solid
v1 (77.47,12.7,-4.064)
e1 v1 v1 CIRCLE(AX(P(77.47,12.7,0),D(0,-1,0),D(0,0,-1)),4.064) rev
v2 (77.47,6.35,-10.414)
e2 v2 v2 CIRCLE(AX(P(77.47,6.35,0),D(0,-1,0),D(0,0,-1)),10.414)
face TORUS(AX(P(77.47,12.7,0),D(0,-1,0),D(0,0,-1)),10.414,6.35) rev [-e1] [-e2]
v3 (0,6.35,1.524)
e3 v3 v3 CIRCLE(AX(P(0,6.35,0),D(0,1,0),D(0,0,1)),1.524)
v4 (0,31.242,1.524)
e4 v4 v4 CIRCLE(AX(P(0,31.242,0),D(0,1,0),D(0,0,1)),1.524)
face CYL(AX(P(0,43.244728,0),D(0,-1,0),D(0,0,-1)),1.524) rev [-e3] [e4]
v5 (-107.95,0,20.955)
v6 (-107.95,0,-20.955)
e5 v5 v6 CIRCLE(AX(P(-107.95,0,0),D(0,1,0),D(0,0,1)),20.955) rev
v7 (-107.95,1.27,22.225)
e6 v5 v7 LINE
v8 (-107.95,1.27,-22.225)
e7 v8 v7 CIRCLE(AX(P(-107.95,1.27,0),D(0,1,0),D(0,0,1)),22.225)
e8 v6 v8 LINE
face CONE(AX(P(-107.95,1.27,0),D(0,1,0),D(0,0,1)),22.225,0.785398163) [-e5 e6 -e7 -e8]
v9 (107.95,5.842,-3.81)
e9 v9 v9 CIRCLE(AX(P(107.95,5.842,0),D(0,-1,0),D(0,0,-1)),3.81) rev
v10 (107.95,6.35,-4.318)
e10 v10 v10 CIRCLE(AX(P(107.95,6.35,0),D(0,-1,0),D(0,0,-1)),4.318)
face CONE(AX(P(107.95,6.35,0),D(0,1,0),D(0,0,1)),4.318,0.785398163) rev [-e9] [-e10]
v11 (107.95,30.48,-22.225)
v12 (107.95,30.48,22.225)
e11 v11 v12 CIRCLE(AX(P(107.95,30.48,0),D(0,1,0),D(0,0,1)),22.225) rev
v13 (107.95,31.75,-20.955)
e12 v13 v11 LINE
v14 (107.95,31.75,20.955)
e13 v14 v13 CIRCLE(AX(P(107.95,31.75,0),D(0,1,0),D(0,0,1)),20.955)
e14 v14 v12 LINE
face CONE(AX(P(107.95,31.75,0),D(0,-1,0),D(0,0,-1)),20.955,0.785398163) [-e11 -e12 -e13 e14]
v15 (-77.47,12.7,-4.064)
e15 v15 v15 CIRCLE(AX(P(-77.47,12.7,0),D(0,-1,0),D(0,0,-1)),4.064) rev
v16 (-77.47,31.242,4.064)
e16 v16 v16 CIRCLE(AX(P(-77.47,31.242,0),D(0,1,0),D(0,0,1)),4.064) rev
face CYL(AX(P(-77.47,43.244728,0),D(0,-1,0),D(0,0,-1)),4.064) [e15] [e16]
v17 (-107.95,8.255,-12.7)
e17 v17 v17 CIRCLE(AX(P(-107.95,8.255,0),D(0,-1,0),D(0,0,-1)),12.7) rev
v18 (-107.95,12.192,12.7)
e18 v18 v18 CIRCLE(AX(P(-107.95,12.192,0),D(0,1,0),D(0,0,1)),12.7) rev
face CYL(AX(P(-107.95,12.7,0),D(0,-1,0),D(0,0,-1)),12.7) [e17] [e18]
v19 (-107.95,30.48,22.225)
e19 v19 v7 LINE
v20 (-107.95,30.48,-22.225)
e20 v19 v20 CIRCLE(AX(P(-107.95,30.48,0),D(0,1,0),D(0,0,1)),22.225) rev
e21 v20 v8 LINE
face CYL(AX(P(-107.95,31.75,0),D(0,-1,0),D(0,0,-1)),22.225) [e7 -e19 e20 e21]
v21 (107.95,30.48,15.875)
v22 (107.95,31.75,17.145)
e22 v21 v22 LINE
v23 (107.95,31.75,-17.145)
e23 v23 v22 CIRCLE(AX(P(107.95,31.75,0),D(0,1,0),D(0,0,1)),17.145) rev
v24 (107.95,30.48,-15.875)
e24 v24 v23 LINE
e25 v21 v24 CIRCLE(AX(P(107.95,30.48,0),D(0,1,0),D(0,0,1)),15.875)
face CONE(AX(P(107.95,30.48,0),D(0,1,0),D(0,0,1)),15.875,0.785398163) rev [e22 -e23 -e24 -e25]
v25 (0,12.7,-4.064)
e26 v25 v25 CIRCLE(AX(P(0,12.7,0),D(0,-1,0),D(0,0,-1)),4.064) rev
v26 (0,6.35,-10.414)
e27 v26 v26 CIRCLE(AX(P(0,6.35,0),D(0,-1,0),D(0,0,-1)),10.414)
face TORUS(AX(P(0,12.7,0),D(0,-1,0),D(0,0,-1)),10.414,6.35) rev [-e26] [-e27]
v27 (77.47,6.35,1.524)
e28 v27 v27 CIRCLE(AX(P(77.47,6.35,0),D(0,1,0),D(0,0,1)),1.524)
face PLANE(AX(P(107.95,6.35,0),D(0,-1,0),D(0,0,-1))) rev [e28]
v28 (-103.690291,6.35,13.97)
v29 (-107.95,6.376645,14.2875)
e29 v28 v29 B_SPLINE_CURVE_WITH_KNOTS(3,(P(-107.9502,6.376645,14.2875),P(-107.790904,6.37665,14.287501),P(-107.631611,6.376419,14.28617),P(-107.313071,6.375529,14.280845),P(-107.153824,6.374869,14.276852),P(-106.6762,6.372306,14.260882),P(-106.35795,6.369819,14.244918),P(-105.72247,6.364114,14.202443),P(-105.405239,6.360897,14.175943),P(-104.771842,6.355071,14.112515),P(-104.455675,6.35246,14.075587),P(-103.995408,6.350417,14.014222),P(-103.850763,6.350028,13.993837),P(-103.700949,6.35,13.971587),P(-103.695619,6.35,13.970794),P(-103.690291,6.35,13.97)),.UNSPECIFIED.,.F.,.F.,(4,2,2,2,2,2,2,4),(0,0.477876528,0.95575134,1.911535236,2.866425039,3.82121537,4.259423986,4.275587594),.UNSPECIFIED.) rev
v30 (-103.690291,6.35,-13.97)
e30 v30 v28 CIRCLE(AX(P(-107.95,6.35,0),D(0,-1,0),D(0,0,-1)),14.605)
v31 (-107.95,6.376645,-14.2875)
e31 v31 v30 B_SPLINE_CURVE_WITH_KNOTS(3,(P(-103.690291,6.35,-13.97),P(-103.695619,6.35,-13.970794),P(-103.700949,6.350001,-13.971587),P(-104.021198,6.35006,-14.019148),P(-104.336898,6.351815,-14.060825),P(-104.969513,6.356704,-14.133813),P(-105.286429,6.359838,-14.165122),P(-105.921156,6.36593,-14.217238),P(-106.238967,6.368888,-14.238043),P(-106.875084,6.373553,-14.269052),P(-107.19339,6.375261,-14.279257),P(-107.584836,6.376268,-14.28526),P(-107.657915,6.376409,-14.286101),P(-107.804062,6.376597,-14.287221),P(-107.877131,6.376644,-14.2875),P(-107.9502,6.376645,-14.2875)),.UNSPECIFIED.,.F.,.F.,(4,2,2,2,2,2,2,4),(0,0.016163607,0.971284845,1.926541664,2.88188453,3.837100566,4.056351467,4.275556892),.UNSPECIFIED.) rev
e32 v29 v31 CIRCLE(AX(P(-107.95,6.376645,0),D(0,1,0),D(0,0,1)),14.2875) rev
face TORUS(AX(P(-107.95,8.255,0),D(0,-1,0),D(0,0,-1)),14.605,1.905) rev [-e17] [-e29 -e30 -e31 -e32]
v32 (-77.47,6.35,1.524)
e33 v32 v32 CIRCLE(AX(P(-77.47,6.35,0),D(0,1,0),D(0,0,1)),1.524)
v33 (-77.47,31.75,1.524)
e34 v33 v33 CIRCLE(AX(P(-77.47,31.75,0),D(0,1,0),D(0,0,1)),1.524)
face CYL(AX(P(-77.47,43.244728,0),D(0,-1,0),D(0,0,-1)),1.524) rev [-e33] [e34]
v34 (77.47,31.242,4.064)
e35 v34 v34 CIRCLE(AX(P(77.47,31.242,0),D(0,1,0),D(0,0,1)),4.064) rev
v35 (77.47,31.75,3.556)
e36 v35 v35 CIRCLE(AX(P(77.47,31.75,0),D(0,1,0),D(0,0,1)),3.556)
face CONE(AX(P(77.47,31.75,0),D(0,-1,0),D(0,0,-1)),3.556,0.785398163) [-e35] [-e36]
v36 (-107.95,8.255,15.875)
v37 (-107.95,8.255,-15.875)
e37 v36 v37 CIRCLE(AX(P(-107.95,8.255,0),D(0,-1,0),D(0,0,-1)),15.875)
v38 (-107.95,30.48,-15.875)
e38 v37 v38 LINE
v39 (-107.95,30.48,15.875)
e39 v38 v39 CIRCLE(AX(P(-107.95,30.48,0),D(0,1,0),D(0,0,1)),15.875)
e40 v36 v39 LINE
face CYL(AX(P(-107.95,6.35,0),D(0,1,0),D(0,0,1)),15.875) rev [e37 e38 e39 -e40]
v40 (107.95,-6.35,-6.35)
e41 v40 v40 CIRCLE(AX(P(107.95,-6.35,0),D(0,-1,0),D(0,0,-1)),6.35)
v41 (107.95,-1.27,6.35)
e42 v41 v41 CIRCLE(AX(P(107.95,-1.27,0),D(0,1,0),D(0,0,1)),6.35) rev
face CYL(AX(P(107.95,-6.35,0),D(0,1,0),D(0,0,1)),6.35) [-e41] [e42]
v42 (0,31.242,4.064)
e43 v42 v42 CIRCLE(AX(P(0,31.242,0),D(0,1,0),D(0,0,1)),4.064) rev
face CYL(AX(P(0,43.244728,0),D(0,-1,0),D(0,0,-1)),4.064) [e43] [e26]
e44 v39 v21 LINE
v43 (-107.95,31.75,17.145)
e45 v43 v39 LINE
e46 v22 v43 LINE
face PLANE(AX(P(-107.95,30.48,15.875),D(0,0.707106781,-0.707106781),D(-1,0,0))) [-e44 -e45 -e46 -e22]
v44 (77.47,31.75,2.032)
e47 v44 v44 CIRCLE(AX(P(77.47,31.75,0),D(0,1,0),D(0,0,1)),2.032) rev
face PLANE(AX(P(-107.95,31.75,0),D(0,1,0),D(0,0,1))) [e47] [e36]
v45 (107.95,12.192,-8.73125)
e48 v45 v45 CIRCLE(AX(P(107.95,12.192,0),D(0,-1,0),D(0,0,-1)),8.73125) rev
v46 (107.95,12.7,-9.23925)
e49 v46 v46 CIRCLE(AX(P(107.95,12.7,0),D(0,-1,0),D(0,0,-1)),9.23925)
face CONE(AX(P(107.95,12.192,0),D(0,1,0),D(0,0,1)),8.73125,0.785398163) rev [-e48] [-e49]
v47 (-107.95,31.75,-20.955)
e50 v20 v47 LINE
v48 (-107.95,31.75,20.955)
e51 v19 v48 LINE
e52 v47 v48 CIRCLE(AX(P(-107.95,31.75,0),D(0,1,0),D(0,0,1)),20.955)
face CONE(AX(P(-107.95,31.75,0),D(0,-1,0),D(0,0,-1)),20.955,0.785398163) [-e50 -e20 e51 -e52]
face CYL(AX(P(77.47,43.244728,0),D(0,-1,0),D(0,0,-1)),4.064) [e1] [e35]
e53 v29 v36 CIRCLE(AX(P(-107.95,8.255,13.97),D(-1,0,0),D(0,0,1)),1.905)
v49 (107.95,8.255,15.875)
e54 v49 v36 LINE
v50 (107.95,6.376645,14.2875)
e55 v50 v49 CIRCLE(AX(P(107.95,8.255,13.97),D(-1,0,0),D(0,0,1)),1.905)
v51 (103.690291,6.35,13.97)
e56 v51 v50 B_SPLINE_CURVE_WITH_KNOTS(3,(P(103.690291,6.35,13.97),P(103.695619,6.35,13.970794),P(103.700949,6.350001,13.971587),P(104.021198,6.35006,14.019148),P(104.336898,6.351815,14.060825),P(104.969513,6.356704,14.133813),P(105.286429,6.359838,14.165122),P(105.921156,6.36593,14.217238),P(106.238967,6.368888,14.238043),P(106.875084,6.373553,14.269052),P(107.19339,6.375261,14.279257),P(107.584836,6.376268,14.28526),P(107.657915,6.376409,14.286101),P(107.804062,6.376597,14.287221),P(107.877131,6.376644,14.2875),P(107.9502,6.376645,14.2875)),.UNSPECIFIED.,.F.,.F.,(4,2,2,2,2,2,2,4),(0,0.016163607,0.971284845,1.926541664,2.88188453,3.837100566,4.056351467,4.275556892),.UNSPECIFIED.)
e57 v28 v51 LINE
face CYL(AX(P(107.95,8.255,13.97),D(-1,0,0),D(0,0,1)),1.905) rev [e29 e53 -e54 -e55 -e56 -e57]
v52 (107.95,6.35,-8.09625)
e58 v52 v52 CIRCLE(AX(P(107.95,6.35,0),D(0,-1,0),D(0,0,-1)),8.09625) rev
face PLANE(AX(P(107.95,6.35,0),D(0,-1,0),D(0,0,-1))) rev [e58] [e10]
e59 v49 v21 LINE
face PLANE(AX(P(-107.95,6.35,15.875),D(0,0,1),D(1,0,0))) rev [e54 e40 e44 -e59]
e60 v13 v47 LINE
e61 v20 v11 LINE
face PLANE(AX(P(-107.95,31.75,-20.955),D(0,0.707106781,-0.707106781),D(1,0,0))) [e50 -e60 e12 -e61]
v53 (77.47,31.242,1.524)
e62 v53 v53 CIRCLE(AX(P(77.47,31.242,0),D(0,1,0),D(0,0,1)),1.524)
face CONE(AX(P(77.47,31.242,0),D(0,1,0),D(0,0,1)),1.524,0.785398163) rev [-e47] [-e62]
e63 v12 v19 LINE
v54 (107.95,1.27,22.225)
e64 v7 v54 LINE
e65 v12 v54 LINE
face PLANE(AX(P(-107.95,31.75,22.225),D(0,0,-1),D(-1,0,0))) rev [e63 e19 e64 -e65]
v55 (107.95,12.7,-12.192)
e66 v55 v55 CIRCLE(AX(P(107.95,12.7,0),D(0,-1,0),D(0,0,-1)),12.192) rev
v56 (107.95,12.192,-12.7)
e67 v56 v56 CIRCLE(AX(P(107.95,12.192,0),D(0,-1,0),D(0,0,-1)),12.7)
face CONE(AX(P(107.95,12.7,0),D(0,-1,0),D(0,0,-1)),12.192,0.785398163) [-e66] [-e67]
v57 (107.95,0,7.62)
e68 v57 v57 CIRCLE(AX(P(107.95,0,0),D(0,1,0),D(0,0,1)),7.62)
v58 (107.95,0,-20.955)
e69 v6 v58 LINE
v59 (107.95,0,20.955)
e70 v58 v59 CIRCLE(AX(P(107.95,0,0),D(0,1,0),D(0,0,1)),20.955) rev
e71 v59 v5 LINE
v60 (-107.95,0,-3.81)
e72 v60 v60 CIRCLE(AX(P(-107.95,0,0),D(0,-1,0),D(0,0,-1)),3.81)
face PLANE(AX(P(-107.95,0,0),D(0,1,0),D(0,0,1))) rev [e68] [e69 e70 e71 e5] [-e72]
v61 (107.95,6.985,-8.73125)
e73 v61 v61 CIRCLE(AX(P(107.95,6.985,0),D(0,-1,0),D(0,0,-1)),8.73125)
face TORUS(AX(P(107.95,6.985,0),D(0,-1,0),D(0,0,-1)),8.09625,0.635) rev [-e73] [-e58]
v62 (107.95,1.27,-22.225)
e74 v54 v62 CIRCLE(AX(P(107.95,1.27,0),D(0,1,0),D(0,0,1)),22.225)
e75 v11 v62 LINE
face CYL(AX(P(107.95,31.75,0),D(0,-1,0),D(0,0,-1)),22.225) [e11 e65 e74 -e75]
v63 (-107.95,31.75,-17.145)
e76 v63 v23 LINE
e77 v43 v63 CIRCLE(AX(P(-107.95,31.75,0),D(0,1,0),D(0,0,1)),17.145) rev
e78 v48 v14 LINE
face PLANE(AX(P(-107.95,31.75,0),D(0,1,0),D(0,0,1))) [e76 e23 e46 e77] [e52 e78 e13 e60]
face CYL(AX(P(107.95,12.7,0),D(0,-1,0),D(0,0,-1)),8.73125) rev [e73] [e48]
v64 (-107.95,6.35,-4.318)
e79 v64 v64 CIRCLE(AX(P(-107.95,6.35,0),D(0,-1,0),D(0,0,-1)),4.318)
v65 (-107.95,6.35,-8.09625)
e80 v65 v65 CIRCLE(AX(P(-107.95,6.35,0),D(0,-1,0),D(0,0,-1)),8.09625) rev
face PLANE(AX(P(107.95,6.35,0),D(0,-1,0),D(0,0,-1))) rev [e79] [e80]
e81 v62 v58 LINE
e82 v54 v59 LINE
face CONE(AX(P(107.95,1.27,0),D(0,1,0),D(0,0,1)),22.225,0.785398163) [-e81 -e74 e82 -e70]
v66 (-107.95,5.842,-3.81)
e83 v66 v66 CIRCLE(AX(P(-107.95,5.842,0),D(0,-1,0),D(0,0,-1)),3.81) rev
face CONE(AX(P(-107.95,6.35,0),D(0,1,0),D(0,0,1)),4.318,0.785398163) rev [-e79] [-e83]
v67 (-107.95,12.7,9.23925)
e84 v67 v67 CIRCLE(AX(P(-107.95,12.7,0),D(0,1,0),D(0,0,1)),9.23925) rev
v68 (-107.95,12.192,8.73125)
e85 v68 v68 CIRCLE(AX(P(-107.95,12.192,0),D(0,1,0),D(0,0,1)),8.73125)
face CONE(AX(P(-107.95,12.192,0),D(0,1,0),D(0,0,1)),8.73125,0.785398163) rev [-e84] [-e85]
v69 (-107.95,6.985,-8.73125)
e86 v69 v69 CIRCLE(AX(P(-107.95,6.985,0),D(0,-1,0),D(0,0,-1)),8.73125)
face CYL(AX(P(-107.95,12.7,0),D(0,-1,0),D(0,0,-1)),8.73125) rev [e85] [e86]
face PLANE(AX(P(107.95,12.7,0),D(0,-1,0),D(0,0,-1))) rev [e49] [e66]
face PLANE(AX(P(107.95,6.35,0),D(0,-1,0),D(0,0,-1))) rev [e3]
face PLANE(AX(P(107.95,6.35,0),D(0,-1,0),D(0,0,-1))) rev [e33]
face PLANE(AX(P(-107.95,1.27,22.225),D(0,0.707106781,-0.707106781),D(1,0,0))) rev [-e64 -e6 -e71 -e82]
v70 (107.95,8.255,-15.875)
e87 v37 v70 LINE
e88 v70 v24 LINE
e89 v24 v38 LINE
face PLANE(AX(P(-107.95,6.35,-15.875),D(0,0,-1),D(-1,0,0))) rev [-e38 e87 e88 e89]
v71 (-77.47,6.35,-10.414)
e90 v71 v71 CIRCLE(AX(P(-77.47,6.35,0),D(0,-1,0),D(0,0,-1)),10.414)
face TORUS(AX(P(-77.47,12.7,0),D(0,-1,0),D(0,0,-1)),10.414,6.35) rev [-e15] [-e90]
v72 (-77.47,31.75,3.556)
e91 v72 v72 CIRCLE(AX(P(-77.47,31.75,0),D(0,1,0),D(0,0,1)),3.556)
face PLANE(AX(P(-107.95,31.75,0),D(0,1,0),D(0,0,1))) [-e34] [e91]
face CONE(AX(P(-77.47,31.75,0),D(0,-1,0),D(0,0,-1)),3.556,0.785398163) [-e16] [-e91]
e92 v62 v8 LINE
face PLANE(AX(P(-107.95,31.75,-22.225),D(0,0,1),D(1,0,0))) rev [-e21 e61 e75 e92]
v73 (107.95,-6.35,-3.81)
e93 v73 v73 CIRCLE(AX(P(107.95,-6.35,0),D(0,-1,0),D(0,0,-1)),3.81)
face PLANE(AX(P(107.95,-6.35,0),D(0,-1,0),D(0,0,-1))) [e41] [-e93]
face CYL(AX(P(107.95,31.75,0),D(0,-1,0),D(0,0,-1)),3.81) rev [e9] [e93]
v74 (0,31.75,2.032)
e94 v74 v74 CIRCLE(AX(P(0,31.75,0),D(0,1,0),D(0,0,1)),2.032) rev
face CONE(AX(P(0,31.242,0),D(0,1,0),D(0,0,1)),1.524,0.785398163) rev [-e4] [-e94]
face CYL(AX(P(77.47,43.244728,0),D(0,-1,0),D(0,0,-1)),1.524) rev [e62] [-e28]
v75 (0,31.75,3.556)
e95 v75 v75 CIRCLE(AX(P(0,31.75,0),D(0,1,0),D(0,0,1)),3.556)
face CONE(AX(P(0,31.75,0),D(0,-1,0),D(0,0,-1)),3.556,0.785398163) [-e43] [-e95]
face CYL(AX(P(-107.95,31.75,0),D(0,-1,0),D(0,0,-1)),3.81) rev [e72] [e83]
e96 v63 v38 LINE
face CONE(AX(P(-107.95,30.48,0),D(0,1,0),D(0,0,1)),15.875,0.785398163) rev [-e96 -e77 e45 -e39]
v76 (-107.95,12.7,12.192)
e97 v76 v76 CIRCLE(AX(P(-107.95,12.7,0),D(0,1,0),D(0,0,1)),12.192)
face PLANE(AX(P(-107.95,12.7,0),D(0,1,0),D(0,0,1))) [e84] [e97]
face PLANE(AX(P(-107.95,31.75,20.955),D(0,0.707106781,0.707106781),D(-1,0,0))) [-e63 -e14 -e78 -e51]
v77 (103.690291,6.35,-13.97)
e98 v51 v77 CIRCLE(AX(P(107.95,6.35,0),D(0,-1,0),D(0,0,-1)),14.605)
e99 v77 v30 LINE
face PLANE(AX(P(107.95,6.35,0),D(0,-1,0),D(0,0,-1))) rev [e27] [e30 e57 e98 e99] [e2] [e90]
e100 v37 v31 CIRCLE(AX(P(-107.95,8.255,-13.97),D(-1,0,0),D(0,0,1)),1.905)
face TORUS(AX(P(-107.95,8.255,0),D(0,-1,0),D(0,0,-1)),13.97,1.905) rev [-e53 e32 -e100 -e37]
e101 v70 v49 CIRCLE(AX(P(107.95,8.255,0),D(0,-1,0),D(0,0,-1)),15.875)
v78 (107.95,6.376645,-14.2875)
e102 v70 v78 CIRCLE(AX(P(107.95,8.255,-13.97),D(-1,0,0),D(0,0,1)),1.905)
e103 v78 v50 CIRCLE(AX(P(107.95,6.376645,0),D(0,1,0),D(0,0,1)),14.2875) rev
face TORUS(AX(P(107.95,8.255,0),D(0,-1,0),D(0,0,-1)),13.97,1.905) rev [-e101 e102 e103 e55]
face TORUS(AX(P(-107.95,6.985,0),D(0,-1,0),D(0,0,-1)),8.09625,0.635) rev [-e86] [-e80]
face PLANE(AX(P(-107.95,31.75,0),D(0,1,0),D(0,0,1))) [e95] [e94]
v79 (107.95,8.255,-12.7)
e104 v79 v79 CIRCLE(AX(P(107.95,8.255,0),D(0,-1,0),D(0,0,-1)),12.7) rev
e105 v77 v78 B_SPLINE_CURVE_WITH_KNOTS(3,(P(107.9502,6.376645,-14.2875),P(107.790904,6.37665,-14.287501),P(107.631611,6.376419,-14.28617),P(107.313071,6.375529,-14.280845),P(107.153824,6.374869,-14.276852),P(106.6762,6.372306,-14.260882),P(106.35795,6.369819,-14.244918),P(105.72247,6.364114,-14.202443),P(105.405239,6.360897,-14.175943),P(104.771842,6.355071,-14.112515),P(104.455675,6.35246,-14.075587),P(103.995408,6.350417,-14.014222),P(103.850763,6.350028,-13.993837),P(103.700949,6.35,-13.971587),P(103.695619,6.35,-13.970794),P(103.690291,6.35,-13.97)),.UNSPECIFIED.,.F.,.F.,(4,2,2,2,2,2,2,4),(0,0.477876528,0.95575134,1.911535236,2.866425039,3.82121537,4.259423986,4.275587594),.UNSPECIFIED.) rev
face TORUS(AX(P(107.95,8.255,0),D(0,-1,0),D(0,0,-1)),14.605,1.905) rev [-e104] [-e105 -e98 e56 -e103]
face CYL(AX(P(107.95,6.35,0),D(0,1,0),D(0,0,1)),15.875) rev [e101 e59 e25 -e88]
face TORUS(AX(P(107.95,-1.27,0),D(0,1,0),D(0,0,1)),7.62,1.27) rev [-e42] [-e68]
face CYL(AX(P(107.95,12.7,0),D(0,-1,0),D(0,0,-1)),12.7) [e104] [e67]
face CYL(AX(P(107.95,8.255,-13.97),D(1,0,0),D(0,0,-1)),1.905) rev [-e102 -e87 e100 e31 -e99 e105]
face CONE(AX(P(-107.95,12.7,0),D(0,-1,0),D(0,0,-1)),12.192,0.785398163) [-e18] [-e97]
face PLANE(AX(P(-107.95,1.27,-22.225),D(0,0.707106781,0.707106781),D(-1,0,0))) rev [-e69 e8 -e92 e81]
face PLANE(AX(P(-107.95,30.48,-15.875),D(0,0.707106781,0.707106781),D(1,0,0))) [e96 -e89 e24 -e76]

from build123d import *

# Parameters (mm, degrees)
MAINBLOCK_DEPTH     = 31.75
MAINPOCKET_DEPTH    = 25.4
SKETCH3_R           = 3.81
CUT_EXTRUDE1_DEPTH  = 136.82173519
SKETCH4_R           = 12.7
SKETCH4_R_2         = 8.73125
BOSS_EXTRUDE1_DEPTH = 6.35
SKETCH7_R           = 4.064
SKETCH7_R_2         = 1.524
BOSS_EXTRUDE3_DEPTH = 25.4
FILLET2_R           = 0.635
FILLET3_R           = 1.905
FILLET6_R           = 6.35
BOSS_EXTRUDE4_START = 6.35
SKETCH9_R           = 6.35
SKETCH9_R_2         = 3.81
BOSS_EXTRUDE4_DEPTH = 6.35
FILLET7_R           = 1.27
CHAMFER2_SIZE       = 0.508
CHAMFER3_SIZE       = 1.27
CHAMFER4_SIZE       = 1.27


with BuildPart() as part:
    # Sketch1 → MainBlock (new body)
    with BuildSketch(Plane(origin=(0, 0, 0), x_dir=(1, 0, 0), z_dir=(0, 1, 0))):
        with BuildLine():
            Line((-107.95, 22.225), (107.95, 22.225))
            ThreePointArc((107.95, 22.225), (130.175, 0), (107.95, -22.225))
            Line((107.95, -22.225), (-107.95, -22.225))
            ThreePointArc((-107.95, -22.225), (-130.175, 0), (-107.95, 22.225))
        make_face()
    extrude(amount=MAINBLOCK_DEPTH)

    # Sketch2 → MainPocket (cut)
    with BuildSketch(Plane(origin=(0, 31.75, 0), x_dir=(1, 0, 0), z_dir=(0, 1, 0))):
        with BuildLine():
            Line((-107.95, 15.875), (107.95, 15.875))
            ThreePointArc((107.95, 15.875), (123.825, 0), (107.95, -15.875))
            Line((107.95, -15.875), (-107.95, -15.875))
            ThreePointArc((-107.95, -15.875), (-123.825, 0), (-107.95, 15.875))
        make_face()
    extrude(amount=-MAINPOCKET_DEPTH, mode=Mode.SUBTRACT)

    # Sketch3 → Cut-Extrude1 (cut, through all)
    with BuildSketch(Plane.XZ):
        with Locations(Location((-107.95, 0, 0), (0, 0, 270))):
            Circle(SKETCH3_R)
        with Locations(Location((107.95, 0, 0), (0, 0, 270))):
            Circle(SKETCH3_R)
    extrude(amount=-CUT_EXTRUDE1_DEPTH, mode=Mode.SUBTRACT)

    # Sketch4 → Boss-Extrude1 (add)
    # profile 1 of 2: a face of its own
    with BuildSketch(Plane(origin=(0, 6.35, 0), x_dir=(1, 0, 0), z_dir=(0, 1, 0))):
        with Locations(Location((-107.95, 0, 0), (0, 0, 90))):
            Circle(SKETCH4_R)
        with Locations(Location((-107.95, 0, 0), (0, 0, 270))):
            Circle(SKETCH4_R_2, mode=Mode.SUBTRACT)
    # profile 2 of 2: a face of its own
    with BuildSketch(Plane(origin=(0, 6.35, 0), x_dir=(1, 0, 0), z_dir=(0, 1, 0))):
        with Locations(Location((107.95, 0, 0), (0, 0, 90))):
            Circle(SKETCH4_R)
        with Locations(Location((107.95, 0, 0), (0, 0, 90))):
            Circle(SKETCH4_R_2, mode=Mode.SUBTRACT)
    extrude(amount=BOSS_EXTRUDE1_DEPTH)

    # Sketch7 → Boss-Extrude3 (add)
    # profile 1 of 3: a face of its own
    with BuildSketch(Plane(origin=(0, 6.35, 0), x_dir=(1, 0, 0), z_dir=(0, 1, 0))):
        with Locations(Location((-77.47, 0, 0), (0, 0, 90))):
            Circle(SKETCH7_R)
        with Locations(Location((-77.47, 0, 0), (0, 0, 270))):
            Circle(SKETCH7_R_2, mode=Mode.SUBTRACT)
    # profile 2 of 3: a face of its own
    with BuildSketch(Plane(origin=(0, 6.35, 0), x_dir=(1, 0, 0), z_dir=(0, 1, 0))):
        with Locations(Location((0, 0, 0), (0, 0, 90))):
            Circle(SKETCH7_R)
        with Locations(Location((0, 0, 0), (0, 0, 270))):
            Circle(SKETCH7_R_2, mode=Mode.SUBTRACT)
    # profile 3 of 3: a face of its own
    with BuildSketch(Plane(origin=(0, 6.35, 0), x_dir=(1, 0, 0), z_dir=(0, 1, 0))):
        with Locations(Location((77.47, 0, 0), (0, 0, 90))):
            Circle(SKETCH7_R)
        with Locations(Location((77.47, 0, 0), (0, 0, 270))):
            Circle(SKETCH7_R_2, mode=Mode.SUBTRACT)
    extrude(amount=BOSS_EXTRUDE3_DEPTH)

    # Fillet2
    fillet2_edges = [part.edges().sort_by_distance(p)[0] for p in [
        (-107.95, 6.35, -8.73125),
        (107.95, 6.35, 8.73125),
    ]]
    fillet(fillet2_edges, radius=FILLET2_R)

    # Fillet3
    # the kernel refuses this fillet: 1.905 mm, written as the material it adds along each edge
    with BuildSketch(Plane(origin=(107.95, 6.35, 0), x_dir=(0, 0, -1), z_dir=(-1, 0, 0))) as fillet3_piece_1:
        with BuildLine():
            CenterArc((15.875 - FILLET3_R, -FILLET3_R), FILLET3_R, 360, 90)
            Line((15.875, -FILLET3_R), (15.875, 0))
            Line((15.875, 0), (15.875 - FILLET3_R, 0))
        make_face()
    revolve(axis=Axis((107.95, 6.35, 0), (0, -1, 0)), revolution_arc=180)
    with BuildSketch(Plane(origin=(107.95, 6.35, 15.875), x_dir=(0, 0, -1), z_dir=(-1, 0, 0)), Plane(origin=(-107.95, 6.35, -15.875), x_dir=(0, 0, 1), z_dir=(1, 0, 0))) as fillet3_piece_2:
        with BuildLine():
            CenterArc((FILLET3_R, -FILLET3_R), FILLET3_R, 90, 90)
            Line((0, -FILLET3_R), (0, 0))
            Line((0, 0), (FILLET3_R, 0))
        make_face()
    extrude(amount=215.9)
    with BuildSketch(Plane(origin=(-107.95, 6.35, 0), x_dir=(0, 0, 1), z_dir=(1, 0, 0))) as fillet3_piece_3:
        with BuildLine():
            CenterArc((15.875 - FILLET3_R, -FILLET3_R), FILLET3_R, 360, 90)
            Line((15.875, -FILLET3_R), (15.875, 0))
            Line((15.875, 0), (15.875 - FILLET3_R, 0))
        make_face()
    revolve(axis=Axis((-107.95, 6.35, 0), (0, -1, 0)), revolution_arc=180)
    with BuildSketch(Plane(origin=(-107.95, 6.35, 0), x_dir=(0, 0, -1), z_dir=(1, 0, 0))) as fillet3_piece_4:
        with BuildLine():
            CenterArc((12.7 + FILLET3_R, FILLET3_R), FILLET3_R, 180, 90)
            Line((12.7, FILLET3_R), (12.7, 0))
            Line((12.7, 0), (12.7 + FILLET3_R, 0))
        make_face()
    revolve(axis=Axis((-107.95, 6.35, 0), (0, 1, 0)))
    with BuildSketch(Plane(origin=(107.95, 6.35, 0), x_dir=(0, 0, -1), z_dir=(1, 0, 0))) as fillet3_piece_5:
        with BuildLine():
            CenterArc((12.7 + FILLET3_R, FILLET3_R), FILLET3_R, 180, 90)
            Line((12.7 + FILLET3_R, 0), (12.7, 0))
            Line((12.7, 0), (12.7, FILLET3_R))
        make_face()
    revolve(axis=Axis((107.95, 6.35, 0), (0, 1, 0)))

    # Fillet6
    fillet6_edges = [part.edges().sort_by_distance(p)[0] for p in [
        (-77.47, 6.35, 4.064),
        (0, 6.35, 4.064),
        (77.47, 6.35, 4.064),
    ]]
    fillet(fillet6_edges, radius=FILLET6_R)

    # Sketch9 → Boss-Extrude4 (add)
    with BuildSketch(Plane.XZ.offset(BOSS_EXTRUDE4_START)):
        with Locations(Location((107.95, 0, 0), (0, 0, 90))):
            Circle(SKETCH9_R)
        with Locations(Location((107.95, 0, 0), (0, 0, 270))):
            Circle(SKETCH9_R_2, mode=Mode.SUBTRACT)
    extrude(amount=-BOSS_EXTRUDE4_DEPTH)

    # Fillet7
    fillet7_edges = [part.edges().sort_by_distance(p)[0] for p in [
        (107.95, 0, -6.35),
    ]]
    fillet(fillet7_edges, radius=FILLET7_R)

    # Chamfer2
    chamfer2_edges = [part.edges().sort_by_distance(p)[0] for p in [
        (-107.95, 6.35, 3.81),
        (107.95, 6.35, 3.81),
        (-107.95, 12.7, 12.7),
        (-107.95, 12.7, -8.73125),
        (107.95, 12.7, 12.7),
        (107.95, 12.7, 8.73125),
        (-77.47, 31.75, 4.064),
        (0, 31.75, -1.524),
        (0, 31.75, 4.064),
        (77.47, 31.75, -1.524),
        (77.47, 31.75, 4.064),
    ]]
    chamfer(chamfer2_edges, length=CHAMFER2_SIZE)

    # Chamfer3
    chamfer3_edges = [part.edges().sort_by_distance(p)[0] for p in [
        (130.175, 31.75, 0),
        (0, 31.75, -22.225),
        (123.825, 31.75, 0),
        (0, 31.75, -15.875),
        (-123.825, 31.75, 0),
        (0, 31.75, 15.875),
        (-130.175, 31.75, 0),
        (0, 31.75, 22.225),
    ]]
    chamfer(chamfer3_edges, length=CHAMFER3_SIZE)

    # Chamfer4
    chamfer4_edges = [part.edges().sort_by_distance(p)[0] for p in [
        (0, 0, -22.225),
        (130.175, 0, 0),
        (0, 0, 22.225),
        (-130.175, 0, 0),
    ]]
    chamfer(chamfer4_edges, length=CHAMFER4_SIZE)


solid = part.part
